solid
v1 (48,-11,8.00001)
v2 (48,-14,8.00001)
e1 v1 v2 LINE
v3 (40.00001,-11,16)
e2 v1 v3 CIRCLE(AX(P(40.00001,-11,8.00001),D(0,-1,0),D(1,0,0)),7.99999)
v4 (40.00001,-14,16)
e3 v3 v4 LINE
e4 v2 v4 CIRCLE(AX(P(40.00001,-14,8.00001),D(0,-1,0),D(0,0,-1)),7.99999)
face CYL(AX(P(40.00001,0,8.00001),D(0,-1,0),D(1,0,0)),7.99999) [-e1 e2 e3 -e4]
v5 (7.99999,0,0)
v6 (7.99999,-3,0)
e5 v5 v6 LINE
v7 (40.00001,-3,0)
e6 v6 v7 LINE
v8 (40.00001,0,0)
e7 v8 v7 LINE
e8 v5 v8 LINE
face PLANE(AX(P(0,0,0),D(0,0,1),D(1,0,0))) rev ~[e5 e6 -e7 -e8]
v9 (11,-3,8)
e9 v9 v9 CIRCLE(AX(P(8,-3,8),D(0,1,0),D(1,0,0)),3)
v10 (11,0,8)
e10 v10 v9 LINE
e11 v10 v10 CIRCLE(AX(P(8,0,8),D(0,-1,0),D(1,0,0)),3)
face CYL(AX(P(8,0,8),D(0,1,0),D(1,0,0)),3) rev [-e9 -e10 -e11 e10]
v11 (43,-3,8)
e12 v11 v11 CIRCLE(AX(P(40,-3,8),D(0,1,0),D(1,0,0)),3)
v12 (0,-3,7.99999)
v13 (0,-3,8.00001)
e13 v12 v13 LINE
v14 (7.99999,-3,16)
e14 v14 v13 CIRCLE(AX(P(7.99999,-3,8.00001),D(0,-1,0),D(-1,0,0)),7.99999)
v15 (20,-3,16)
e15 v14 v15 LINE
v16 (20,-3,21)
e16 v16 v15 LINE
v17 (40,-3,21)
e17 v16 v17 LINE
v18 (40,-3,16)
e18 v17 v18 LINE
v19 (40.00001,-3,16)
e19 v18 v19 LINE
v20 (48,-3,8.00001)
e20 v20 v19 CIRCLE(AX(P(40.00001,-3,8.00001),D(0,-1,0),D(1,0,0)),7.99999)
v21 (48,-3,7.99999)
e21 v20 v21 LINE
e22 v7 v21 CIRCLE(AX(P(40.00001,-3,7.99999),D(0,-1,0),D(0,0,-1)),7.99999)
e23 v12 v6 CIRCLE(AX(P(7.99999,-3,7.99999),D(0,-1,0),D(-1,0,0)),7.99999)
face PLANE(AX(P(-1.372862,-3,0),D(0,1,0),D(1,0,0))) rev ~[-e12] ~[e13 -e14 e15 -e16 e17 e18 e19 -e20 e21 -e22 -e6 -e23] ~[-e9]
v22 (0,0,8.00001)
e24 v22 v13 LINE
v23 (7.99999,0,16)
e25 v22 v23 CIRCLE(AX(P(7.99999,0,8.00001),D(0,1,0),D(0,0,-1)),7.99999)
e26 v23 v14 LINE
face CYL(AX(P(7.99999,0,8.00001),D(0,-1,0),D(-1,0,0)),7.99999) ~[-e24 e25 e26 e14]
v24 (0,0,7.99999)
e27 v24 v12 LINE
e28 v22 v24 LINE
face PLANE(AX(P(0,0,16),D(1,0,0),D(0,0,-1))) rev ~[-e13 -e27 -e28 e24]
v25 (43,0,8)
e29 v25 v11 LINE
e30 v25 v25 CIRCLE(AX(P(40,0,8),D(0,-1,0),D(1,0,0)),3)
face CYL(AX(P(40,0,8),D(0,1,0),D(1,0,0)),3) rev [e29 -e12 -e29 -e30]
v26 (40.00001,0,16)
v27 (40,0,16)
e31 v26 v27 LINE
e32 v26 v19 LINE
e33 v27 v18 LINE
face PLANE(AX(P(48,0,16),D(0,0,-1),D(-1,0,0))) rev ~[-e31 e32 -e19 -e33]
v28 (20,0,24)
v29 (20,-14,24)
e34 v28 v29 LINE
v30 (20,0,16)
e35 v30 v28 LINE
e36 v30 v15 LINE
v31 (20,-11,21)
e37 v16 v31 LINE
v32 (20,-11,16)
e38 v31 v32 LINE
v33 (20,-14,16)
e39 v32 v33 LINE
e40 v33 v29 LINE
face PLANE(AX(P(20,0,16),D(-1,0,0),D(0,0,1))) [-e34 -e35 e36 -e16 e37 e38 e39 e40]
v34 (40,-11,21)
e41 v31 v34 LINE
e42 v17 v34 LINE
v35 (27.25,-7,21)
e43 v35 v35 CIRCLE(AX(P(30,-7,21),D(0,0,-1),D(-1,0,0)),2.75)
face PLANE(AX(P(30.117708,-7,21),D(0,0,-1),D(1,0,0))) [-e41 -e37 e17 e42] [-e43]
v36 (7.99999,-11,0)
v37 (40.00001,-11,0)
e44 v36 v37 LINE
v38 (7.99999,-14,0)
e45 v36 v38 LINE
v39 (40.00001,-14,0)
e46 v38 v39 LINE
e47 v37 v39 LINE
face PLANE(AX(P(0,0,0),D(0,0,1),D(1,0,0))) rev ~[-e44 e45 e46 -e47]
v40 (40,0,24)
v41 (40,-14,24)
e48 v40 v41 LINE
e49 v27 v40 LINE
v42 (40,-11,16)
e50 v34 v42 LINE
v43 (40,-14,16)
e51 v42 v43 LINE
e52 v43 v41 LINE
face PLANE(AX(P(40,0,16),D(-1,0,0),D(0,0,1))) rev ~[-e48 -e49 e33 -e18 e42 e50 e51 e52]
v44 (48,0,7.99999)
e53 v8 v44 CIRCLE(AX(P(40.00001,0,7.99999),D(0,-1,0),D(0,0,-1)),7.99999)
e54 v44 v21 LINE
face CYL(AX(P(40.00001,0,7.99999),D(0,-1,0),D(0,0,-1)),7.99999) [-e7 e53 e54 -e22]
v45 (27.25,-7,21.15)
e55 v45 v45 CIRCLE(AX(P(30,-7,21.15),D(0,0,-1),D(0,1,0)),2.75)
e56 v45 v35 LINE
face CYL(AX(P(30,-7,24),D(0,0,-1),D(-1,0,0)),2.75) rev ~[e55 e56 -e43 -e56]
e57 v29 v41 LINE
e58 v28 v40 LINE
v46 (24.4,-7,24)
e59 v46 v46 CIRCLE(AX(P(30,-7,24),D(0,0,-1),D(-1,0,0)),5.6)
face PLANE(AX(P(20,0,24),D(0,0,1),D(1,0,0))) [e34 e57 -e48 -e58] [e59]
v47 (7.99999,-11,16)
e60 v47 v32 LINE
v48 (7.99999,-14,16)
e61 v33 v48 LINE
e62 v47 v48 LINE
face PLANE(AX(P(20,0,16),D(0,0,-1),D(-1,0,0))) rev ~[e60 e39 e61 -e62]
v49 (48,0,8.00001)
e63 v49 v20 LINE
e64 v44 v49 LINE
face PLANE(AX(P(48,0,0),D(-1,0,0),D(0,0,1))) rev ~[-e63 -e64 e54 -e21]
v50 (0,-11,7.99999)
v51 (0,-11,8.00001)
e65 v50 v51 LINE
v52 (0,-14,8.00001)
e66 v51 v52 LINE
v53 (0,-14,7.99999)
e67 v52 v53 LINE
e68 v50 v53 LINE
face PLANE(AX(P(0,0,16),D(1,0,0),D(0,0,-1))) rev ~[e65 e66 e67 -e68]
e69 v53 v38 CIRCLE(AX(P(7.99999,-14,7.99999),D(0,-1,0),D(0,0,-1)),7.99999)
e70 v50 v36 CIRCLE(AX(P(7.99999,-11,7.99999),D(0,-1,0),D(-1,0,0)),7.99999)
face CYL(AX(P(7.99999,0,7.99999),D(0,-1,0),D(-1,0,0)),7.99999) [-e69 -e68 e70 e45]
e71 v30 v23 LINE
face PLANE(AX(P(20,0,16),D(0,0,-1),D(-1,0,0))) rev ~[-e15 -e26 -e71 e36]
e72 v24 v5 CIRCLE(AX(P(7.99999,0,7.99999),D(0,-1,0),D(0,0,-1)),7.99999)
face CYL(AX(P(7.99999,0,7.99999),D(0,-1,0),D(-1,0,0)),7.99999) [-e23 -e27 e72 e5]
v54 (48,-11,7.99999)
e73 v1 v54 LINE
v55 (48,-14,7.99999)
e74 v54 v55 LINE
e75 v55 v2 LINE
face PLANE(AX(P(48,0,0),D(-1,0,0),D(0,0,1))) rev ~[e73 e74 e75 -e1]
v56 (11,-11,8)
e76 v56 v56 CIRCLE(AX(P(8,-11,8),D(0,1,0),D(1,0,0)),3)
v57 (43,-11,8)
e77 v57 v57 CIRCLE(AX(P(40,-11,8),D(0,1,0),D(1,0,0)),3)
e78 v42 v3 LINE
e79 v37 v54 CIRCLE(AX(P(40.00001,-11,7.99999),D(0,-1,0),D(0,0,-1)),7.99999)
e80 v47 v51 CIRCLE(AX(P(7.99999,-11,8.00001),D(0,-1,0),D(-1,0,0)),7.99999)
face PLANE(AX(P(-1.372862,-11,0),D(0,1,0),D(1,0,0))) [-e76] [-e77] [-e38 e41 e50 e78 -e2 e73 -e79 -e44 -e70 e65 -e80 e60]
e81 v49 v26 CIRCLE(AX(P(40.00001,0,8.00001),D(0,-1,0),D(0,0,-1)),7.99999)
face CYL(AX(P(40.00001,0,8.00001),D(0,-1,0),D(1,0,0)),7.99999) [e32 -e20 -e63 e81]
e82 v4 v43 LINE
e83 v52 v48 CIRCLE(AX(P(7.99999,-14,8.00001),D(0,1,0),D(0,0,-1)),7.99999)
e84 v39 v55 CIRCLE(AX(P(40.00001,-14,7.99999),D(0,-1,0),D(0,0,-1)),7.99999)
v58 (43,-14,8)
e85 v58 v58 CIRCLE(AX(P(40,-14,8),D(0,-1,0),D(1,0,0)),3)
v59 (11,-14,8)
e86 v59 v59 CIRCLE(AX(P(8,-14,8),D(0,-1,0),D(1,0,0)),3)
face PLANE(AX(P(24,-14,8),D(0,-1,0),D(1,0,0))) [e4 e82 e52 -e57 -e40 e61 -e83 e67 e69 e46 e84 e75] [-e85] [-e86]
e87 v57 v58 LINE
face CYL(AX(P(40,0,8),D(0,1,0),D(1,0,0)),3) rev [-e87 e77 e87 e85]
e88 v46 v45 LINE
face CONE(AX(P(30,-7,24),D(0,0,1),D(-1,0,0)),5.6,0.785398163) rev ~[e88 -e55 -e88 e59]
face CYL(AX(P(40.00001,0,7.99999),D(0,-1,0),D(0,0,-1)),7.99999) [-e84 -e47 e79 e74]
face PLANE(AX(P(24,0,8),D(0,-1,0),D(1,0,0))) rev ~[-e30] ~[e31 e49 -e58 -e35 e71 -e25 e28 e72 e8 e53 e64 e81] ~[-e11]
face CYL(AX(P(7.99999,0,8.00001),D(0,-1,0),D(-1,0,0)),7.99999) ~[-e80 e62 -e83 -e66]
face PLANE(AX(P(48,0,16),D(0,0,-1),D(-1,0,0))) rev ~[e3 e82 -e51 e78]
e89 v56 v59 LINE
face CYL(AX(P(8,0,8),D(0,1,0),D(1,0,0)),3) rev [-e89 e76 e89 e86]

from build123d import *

# Parameters (mm, degrees)
F0_R           = 3
F0_W           = 20
F0_H           = 8
F1_DEPTH       = 14
F2_R           = 7.99999
F3_W           = 62.9811411479
F3_H           = 8
F4_DEPTH       = 21
F6_D           = 5.5
F6_CSINK_D     = 11.2
F6_CSINK_ANGLE = 90


# Not quite as in the source:
# - a fillet or chamfer is up to 0.001 mm smaller than in the source, because OpenCascade refuses the exact size


with BuildPart() as f1:
    # F0 (on Front) → F1 (new body)
    with BuildSketch(Plane.XZ):
        Polygon((0, 16), (0, 0), (48, 0), (48, 16), (40, 16), (20, 16), align=None)
        with Locations((8, 8)):
            Circle(F0_R, mode=Mode.SUBTRACT)
        with Locations((40, 8)):
            Circle(F0_R, mode=Mode.SUBTRACT)
        with Locations((30, 20)):
            Rectangle(F0_W, F0_H)
    extrude(amount=F1_DEPTH)

    # F2 (radius 8 in the source; OpenCascade refuses exactly that, so slightly less here)
    f2_edges = [f1.edges().sort_by_distance(p)[0] for p in [
        (0, -7, 16),
        (0, -7, 0),
        (48, -7, 16),
        (48, -7, 0),
    ]]
    fillet(f2_edges, radius=F2_R)

    # F3 (on face) → F4 (cut)
    with BuildSketch(Plane(origin=(0, 0, 0), x_dir=(1, 0, 0), z_dir=(0, 0, -1))):
        with Locations((30.1177082001, 7)):
            Rectangle(F3_W, F3_H)
    extrude(amount=-F4_DEPTH, mode=Mode.SUBTRACT)

    # F6 (through all)
    with Locations(Plane.XY.offset(24)):
        with Locations((30, -7)):
            CounterSinkHole(F6_D / 2, F6_CSINK_D / 2, counter_sink_angle=F6_CSINK_ANGLE)


solid = f1.part
